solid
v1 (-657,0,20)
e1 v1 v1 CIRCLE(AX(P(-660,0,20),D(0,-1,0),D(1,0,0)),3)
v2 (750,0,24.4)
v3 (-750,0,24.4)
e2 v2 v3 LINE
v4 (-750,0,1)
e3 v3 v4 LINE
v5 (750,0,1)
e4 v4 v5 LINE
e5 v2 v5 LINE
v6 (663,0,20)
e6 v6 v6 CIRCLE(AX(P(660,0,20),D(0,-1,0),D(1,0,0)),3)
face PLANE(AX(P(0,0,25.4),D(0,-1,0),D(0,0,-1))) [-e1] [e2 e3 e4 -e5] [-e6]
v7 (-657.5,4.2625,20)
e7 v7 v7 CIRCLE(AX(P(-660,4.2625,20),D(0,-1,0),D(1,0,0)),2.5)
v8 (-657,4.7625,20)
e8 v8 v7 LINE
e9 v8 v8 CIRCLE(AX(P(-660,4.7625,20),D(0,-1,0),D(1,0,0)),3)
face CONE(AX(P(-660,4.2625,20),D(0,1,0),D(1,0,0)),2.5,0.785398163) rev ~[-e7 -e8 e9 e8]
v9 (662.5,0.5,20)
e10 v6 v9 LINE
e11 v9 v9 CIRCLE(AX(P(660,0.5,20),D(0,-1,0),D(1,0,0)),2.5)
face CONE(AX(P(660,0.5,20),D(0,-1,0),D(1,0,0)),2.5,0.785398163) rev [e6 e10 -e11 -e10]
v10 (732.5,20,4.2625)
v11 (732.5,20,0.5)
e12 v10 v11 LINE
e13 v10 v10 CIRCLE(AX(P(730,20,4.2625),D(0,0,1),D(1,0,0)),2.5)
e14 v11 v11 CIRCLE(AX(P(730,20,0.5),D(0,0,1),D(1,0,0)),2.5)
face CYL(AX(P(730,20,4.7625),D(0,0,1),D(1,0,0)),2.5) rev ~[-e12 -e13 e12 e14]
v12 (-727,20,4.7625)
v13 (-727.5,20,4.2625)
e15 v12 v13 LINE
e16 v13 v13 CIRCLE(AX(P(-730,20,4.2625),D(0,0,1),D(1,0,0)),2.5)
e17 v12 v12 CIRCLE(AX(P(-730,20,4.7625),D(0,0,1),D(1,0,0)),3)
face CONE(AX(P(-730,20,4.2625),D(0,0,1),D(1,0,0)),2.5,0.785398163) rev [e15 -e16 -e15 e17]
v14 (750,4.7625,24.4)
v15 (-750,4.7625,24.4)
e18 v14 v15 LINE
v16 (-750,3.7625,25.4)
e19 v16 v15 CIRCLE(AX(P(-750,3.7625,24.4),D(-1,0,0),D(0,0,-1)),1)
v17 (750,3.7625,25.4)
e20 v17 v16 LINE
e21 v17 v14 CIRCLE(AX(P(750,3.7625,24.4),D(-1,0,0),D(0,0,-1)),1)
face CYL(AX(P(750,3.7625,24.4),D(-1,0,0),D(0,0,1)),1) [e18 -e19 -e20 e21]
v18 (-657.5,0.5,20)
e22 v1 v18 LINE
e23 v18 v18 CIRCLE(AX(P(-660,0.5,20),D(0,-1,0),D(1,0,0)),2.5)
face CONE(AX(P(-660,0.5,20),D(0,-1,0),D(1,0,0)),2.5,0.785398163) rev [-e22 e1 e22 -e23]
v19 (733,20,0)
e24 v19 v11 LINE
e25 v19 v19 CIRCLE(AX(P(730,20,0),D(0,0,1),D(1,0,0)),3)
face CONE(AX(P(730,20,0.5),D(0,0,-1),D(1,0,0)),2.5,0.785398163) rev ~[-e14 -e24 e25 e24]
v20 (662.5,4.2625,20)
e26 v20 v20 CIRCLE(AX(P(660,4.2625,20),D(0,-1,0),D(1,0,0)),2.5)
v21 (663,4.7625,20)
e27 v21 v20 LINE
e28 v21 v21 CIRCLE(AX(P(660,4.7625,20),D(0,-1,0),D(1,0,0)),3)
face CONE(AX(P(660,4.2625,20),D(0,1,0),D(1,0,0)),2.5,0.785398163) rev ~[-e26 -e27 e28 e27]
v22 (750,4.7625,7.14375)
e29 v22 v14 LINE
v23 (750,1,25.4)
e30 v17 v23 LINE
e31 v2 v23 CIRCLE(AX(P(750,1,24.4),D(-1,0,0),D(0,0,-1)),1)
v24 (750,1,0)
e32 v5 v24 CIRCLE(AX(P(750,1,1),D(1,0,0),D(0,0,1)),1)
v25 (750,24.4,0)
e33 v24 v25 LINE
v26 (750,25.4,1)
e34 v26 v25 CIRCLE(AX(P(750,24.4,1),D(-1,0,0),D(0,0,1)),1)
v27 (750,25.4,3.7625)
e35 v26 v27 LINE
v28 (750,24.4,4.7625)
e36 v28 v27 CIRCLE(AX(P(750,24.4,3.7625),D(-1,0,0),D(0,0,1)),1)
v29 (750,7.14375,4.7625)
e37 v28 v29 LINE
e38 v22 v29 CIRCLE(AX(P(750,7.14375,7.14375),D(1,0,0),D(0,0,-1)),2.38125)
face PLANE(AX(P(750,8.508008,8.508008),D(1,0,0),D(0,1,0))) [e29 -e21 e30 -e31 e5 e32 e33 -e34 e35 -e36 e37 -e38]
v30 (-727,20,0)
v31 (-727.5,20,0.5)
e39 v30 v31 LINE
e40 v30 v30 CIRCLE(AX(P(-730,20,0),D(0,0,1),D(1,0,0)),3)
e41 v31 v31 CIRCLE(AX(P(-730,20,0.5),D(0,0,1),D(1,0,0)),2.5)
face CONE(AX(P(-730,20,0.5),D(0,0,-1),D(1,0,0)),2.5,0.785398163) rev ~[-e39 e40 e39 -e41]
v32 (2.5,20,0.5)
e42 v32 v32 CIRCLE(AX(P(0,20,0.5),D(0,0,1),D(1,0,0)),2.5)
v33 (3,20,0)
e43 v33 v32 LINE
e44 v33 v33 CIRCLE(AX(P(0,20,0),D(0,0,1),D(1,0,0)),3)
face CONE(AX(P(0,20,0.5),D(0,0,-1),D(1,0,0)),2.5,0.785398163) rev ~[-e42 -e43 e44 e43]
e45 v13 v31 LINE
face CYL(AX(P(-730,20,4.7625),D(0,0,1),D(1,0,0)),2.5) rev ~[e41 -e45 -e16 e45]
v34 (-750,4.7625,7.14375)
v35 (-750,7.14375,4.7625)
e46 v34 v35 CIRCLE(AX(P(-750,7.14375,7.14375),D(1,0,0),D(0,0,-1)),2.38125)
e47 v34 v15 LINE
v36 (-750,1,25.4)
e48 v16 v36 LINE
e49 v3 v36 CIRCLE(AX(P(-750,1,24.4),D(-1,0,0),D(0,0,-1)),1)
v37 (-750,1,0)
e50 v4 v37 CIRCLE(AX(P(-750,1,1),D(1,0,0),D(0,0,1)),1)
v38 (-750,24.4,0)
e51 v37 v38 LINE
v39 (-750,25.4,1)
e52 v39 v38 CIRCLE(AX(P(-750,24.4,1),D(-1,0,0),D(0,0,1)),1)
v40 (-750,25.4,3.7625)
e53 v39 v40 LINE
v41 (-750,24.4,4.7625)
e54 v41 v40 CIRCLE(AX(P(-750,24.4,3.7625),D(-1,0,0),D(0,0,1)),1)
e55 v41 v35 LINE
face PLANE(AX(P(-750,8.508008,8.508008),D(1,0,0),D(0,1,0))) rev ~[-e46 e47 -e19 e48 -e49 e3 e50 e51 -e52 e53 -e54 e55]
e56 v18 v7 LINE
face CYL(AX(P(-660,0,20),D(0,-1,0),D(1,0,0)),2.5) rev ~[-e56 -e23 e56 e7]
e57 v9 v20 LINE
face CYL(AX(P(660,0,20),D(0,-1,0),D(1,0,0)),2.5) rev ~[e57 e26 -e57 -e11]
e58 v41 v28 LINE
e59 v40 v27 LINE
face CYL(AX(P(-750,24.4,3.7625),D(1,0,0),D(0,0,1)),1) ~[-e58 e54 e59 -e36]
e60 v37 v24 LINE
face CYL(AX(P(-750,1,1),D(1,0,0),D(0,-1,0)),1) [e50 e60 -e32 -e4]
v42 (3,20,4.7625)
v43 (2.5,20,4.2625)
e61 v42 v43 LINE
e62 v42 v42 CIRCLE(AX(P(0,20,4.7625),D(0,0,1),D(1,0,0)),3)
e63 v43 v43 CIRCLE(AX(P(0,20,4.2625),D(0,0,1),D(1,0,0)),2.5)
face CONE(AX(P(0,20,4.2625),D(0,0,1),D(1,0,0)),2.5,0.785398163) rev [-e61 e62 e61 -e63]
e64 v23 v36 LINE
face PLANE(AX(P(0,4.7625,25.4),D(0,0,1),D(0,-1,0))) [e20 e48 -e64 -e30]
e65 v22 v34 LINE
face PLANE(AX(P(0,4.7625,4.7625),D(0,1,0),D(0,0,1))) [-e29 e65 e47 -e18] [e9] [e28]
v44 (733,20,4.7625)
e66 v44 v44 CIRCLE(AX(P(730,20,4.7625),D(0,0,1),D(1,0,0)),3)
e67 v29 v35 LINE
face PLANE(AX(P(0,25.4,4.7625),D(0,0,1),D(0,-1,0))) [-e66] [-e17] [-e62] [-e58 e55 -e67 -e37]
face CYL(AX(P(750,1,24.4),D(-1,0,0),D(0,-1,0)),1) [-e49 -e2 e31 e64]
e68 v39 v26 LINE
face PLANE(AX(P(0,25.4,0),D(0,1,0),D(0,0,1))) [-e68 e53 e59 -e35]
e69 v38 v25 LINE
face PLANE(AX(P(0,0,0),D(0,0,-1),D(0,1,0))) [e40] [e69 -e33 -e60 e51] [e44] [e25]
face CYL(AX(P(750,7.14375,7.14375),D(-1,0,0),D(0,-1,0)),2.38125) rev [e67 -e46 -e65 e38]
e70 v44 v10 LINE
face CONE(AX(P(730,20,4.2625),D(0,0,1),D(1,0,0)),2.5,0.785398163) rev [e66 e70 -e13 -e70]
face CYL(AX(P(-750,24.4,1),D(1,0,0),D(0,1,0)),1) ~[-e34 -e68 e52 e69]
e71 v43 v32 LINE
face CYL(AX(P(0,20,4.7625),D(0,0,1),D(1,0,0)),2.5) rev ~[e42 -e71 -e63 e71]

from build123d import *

# Parameters (mm, degrees)
F1_DEPTH = 750
F2_R     = 1
F3_R     = 2.38125
F4_R     = 2.5
F5_DEPTH = 25
F6_SIZE  = 0.5
F7_R     = 2.5
F8_DEPTH = 25
F9_SIZE  = 0.5


with BuildPart() as f1:
    # F0 (on Right) → F1 (new body, symmetric)
    with BuildSketch(Plane.YZ):
        Polygon((0, 25.4), (0, 0), (25.4, 0), (25.4, 4.7625), (4.7625, 4.7625), (4.7625, 25.4), align=None)
    extrude(amount=F1_DEPTH, both=True)

    # F2
    f2_edges = [f1.edges().sort_by_distance(p)[0] for p in [
        (0, 0, 25.4),
        (0, 4.7625, 25.4),
        (0, 0, 0),
        (0, 25.4, 4.7625),
        (0, 25.4, 0),
    ]]
    fillet(f2_edges, radius=F2_R)

    # F3
    f3_edges = [f1.edges().sort_by_distance(p)[0] for p in [
        (0, 4.7625, 4.7625),
    ]]
    fillet(f3_edges, radius=F3_R)

    # F4 (on face) → F5 (cut)
    with BuildSketch(Plane.XY.offset(4.7625)):
        with Locations((-730, 20)):
            Circle(F4_R)
        with Locations((0, 20)):
            Circle(F4_R)
        with Locations((730, 20)):
            Circle(F4_R)
    extrude(amount=-F5_DEPTH, mode=Mode.SUBTRACT)

    # F6
    f6_edges = [f1.edges().sort_by_distance(p)[0] for p in [
        (-732.5, 20, 4.7625),
        (-727.5, 20, 2.38125),
        (-732.5, 20, 0),
        (-2.5, 20, 4.7625),
        (2.5, 20, 2.38125),
        (-2.5, 20, 0),
        (727.5, 20, 4.7625),
        (732.5, 20, 2.38125),
        (727.5, 20, 0),
    ]]
    chamfer(f6_edges, length=F6_SIZE)

    # F7 (on face) → F8 (cut)
    with BuildSketch(Plane.XZ):
        with Locations((-660, 20)):
            Circle(F7_R)
        with Locations((660, 20)):
            Circle(F7_R)
    extrude(amount=-F8_DEPTH, mode=Mode.SUBTRACT)

    # F9
    f9_edges = [f1.edges().sort_by_distance(p)[0] for p in [
        (-662.5, 0, 20),
        (-657.5, 2.38125, 20),
        (-662.5, 4.7625, 20),
        (657.5, 0, 20),
        (662.5, 2.38125, 20),
        (657.5, 4.7625, 20),
    ]]
    chamfer(f9_edges, length=F9_SIZE)


solid = f1.part
